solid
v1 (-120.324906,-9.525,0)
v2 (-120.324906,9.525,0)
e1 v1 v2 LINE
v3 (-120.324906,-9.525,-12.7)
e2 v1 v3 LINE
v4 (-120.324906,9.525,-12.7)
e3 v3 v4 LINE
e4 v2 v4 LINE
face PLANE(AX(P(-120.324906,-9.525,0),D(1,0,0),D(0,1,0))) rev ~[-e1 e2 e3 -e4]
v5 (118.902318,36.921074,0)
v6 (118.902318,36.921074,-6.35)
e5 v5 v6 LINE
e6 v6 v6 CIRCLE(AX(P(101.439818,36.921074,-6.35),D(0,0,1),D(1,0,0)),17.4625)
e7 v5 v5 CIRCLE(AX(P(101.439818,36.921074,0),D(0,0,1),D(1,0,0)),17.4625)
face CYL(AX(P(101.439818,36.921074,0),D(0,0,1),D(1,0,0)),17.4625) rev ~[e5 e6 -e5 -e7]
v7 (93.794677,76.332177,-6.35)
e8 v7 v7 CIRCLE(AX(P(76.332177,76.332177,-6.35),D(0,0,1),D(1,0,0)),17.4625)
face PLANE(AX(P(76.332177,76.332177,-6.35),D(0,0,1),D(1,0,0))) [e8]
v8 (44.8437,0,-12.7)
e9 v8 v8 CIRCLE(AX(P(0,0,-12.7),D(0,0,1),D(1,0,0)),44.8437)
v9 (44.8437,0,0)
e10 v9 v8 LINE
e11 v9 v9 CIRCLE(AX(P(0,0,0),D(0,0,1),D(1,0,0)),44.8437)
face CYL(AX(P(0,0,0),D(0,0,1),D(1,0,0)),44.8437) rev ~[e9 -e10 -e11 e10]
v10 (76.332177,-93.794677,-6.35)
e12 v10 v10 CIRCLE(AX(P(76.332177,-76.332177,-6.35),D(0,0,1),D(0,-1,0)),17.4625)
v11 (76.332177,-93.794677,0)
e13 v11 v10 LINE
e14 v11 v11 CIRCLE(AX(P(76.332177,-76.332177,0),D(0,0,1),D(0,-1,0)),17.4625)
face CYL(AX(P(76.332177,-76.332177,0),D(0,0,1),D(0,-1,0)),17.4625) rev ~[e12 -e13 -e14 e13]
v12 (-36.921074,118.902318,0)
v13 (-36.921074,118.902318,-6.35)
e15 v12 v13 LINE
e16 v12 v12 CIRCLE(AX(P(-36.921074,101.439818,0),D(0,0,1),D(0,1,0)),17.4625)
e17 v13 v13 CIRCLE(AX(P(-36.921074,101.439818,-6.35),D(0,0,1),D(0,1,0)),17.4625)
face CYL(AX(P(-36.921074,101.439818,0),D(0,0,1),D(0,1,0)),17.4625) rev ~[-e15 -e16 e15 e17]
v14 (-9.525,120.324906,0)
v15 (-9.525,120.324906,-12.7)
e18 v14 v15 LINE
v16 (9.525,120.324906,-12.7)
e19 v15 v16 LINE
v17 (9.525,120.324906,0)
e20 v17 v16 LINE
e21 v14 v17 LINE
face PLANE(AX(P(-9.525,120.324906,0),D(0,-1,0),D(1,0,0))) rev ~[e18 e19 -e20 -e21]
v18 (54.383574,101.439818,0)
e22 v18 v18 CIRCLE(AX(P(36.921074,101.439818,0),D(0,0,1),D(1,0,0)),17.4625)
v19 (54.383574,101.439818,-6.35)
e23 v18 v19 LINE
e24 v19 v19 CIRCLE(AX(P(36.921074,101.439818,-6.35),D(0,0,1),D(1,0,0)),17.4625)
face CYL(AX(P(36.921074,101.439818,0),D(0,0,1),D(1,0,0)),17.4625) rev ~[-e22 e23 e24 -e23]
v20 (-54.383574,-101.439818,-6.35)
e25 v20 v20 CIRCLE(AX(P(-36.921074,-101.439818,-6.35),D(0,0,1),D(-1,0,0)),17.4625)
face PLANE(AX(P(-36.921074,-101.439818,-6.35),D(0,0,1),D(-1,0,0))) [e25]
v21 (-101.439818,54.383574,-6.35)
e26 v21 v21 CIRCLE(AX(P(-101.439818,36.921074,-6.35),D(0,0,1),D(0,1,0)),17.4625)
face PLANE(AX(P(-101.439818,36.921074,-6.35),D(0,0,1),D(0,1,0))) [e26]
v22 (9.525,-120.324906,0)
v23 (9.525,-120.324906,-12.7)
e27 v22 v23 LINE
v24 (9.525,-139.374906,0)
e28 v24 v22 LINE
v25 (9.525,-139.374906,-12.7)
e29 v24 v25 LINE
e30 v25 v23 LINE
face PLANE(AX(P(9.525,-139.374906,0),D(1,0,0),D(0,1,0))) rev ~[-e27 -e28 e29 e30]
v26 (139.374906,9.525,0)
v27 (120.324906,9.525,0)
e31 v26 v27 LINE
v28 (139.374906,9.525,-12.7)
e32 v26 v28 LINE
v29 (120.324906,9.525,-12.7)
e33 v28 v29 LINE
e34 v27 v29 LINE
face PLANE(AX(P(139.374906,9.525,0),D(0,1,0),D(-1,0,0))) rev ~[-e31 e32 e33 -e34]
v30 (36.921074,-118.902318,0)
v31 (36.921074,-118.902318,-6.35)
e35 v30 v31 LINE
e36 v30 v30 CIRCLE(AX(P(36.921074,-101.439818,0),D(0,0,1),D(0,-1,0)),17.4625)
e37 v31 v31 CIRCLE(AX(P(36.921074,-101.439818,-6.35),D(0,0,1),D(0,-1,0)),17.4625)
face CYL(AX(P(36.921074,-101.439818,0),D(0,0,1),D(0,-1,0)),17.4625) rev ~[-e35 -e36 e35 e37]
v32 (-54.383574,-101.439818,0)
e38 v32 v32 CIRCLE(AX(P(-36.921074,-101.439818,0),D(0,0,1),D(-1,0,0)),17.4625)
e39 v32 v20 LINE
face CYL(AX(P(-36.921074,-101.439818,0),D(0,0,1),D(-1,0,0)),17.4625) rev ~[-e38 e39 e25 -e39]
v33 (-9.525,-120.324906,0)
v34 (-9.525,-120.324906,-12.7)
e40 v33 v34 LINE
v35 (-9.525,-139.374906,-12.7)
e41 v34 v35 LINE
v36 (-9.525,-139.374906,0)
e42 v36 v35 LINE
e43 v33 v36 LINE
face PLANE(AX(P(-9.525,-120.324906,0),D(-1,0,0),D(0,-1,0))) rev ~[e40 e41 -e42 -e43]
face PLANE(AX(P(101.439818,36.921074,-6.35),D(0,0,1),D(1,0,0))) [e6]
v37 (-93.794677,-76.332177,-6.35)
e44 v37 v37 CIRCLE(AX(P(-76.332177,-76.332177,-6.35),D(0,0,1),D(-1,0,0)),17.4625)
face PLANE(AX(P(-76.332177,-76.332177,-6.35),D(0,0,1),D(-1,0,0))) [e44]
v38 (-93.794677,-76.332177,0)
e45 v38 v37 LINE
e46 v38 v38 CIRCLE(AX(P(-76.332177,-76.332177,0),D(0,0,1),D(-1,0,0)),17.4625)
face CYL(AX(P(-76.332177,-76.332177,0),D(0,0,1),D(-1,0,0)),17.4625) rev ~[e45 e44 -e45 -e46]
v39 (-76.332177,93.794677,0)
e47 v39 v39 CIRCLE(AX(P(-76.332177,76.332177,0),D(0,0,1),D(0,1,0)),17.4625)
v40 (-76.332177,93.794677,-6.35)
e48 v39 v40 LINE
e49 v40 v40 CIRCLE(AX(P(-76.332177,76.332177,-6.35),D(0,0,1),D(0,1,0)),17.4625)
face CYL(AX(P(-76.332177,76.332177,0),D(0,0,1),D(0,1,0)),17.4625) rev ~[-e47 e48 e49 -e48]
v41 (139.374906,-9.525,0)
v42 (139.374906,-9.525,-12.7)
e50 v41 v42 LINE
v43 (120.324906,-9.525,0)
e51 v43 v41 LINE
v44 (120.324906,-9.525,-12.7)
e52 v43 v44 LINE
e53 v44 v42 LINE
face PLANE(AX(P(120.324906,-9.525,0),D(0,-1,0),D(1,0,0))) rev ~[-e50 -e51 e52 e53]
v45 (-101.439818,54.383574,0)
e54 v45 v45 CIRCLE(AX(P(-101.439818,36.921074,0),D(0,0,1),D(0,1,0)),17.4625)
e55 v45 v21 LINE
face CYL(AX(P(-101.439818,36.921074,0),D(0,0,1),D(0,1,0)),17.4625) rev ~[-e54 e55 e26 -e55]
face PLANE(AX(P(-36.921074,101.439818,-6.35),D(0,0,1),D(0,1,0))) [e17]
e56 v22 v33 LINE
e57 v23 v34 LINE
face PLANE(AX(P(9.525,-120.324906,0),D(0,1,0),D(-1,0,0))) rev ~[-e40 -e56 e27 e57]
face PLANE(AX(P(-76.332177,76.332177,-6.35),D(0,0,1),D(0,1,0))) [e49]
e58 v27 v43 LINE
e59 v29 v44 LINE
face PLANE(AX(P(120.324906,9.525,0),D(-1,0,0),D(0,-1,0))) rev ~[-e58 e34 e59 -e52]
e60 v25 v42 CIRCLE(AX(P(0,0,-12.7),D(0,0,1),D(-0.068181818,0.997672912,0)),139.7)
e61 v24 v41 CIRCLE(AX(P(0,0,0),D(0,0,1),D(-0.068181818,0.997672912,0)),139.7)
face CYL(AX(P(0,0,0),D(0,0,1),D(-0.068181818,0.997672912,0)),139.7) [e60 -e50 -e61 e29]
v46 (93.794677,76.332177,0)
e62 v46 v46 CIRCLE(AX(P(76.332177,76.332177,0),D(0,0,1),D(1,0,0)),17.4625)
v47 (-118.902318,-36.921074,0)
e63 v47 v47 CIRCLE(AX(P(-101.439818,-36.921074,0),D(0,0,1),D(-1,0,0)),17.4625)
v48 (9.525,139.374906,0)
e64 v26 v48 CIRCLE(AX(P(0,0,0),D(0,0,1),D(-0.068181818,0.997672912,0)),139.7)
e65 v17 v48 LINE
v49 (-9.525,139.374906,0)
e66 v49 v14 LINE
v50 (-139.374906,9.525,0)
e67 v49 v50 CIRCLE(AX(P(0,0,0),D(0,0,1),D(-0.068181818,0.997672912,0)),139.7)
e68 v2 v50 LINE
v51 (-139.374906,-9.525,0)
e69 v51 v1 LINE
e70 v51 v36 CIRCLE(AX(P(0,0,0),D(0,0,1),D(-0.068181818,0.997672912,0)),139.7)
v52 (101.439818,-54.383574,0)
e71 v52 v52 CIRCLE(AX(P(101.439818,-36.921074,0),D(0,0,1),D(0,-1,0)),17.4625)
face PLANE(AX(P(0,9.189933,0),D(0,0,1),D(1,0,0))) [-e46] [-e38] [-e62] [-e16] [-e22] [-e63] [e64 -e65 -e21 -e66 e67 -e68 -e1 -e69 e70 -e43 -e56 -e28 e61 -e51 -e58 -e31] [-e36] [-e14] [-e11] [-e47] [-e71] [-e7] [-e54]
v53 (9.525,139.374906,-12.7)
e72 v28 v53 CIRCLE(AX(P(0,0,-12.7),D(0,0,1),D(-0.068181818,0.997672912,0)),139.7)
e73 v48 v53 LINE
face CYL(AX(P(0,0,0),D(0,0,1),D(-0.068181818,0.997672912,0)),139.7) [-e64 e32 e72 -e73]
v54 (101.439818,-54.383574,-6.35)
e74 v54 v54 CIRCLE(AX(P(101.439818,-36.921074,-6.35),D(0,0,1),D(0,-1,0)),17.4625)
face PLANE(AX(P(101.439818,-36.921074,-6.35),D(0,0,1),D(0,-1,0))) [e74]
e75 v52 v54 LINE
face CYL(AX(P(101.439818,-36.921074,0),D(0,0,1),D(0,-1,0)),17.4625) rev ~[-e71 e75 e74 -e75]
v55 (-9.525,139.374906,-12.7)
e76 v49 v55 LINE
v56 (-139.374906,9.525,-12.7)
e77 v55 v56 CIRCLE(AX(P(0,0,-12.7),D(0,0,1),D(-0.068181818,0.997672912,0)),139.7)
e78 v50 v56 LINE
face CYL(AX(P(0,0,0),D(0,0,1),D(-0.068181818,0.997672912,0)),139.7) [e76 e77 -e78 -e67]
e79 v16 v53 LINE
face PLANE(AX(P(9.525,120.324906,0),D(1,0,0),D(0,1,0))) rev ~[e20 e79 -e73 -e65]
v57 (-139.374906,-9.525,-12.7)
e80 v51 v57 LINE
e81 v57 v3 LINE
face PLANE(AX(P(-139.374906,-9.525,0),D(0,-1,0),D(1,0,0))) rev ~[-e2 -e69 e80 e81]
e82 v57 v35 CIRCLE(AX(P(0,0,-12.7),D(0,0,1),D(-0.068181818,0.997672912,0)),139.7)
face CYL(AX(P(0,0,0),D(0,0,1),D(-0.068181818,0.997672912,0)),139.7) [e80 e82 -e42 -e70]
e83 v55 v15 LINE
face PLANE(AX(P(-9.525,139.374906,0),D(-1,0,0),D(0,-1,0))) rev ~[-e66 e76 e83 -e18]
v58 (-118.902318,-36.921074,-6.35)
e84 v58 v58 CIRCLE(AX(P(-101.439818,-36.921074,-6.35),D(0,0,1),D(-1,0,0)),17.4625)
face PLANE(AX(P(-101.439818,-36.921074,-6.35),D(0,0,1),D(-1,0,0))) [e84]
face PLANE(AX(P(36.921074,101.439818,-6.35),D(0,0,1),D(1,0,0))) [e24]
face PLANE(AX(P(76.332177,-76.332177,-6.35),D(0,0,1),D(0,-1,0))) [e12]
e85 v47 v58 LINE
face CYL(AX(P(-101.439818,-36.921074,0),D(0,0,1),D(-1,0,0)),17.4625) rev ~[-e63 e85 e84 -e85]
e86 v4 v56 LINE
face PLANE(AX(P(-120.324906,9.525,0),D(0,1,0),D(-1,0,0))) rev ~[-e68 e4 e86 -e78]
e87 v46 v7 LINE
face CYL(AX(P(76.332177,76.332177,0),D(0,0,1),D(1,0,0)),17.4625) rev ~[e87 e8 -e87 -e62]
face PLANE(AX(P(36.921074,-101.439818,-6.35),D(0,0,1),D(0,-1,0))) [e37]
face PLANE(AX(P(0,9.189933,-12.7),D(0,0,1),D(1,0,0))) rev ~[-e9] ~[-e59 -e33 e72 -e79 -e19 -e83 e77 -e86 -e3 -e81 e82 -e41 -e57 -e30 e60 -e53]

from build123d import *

# Parameters (mm, degrees)
F0_R            = 44.8437
F0_R_2          = 17.4625
F0_W            = 19.05
F0_H            = 6.35
F1_DEPTH        = 12.7
F2_DEPTH        = 6.35
F2_COPIES_COUNT = 4
F3_DEPTH        = 12.701
F3_COPIES_COUNT = 4
F5_DEPTH        = 25.4


# Not quite as in the source:
# - a pattern or mirror of a feature is missing from the dataset's text; its kind, count and spacing are read off the source's solid


with BuildPart() as f1:
    # F0 (on Top) → F1 (new body)
    with BuildSketch(Plane.XY):
        with BuildLine():
            ThreePointArc((-9.525, 139.3749058296), (-95.3557746023, -102.0948884617), (139.7, 0))
            ThreePointArc((139.7, 0), (102.0948884617, 95.3557746023), (9.525, 139.3749058296))
            Line((9.525, 139.3749058296), (9.525, 120.3249058296))
            Line((9.525, 120.3249058296), (9.525, 113.9749058296))
            Line((9.525, 113.9749058296), (-9.525, 113.9749058296))
            Line((-9.525, 113.9749058296), (-9.525, 120.3249058296))
            Line((-9.525, 120.3249058296), (-9.525, 139.3749058296))
        make_face()
        Circle(F0_R, mode=Mode.SUBTRACT)
        with Locations((101.4398184138, 36.921074472)):
            Circle(F0_R_2, mode=Mode.SUBTRACT)
        with Locations((36.921074472, 101.4398184138)):
            Circle(F0_R_2, mode=Mode.SUBTRACT)
        with Locations((76.3321770291, 76.3321770291)):
            Circle(F0_R_2, mode=Mode.SUBTRACT)
        with BuildLine():
            Line((9.525, 120.3249058296), (9.525, 139.3749058296))
            ThreePointArc((9.525, 139.3749058296), (0, 139.7), (-9.525, 139.3749058296))
            Line((-9.525, 139.3749058296), (-9.525, 120.3249058296))
            Line((-9.525, 120.3249058296), (9.525, 120.3249058296))
        make_face()
        with Locations((36.921074472, 101.4398184138)):
            Circle(F0_R_2)
        with Locations((76.3321770291, 76.3321770291)):
            Circle(F0_R_2)
        with Locations((101.4398184138, 36.921074472)):
            Circle(F0_R_2)
        with Locations((0, 117.1499058296)):
            Rectangle(F0_W, F0_H)
        Circle(F0_R)
    extrude(amount=-F1_DEPTH)

    # F0 (on Top) → F2 (cut)
    with BuildSketch(Plane.XY):
        with Locations((36.921074472, 101.4398184138)):
            Circle(F0_R_2)
        with Locations((76.3321770291, 76.3321770291)):
            Circle(F0_R_2)
        with Locations((101.4398184138, 36.921074472)):
            Circle(F0_R_2)
    f2 = extrude(amount=-F2_DEPTH, mode=Mode.SUBTRACT)

    # F2_copies: F2 ×4 about axis
    f2_copies_axis = Axis((0, 0, 0), (0, 0, 1))
    for i in range(1, F2_COPIES_COUNT):
        add(f2.rotate(f2_copies_axis, i * 360 / F2_COPIES_COUNT), mode=Mode.SUBTRACT)

    # F0 (on Top) → F3 (cut, through all)
    with BuildSketch(Plane.XY):
        with BuildLine():
            Line((9.525, 120.3249058296), (9.525, 139.3749058296))
            ThreePointArc((9.525, 139.3749058296), (0, 139.7), (-9.525, 139.3749058296))
            Line((-9.525, 139.3749058296), (-9.525, 120.3249058296))
            Line((-9.525, 120.3249058296), (9.525, 120.3249058296))
        make_face()
    f3 = extrude(amount=-F3_DEPTH, mode=Mode.SUBTRACT)

    # F3_copies: F3 ×4 about axis
    f3_copies_axis = Axis((0, 0, 0), (0, 0, 1))
    for i in range(1, F3_COPIES_COUNT):
        add(f3.rotate(f3_copies_axis, i * 360 / F3_COPIES_COUNT), mode=Mode.SUBTRACT)

    # F0 (on Top) → F5 (cut)
    with BuildSketch(Plane.XY):
        Circle(F0_R)
    extrude(amount=-F5_DEPTH, mode=Mode.SUBTRACT)


solid = f1.part
